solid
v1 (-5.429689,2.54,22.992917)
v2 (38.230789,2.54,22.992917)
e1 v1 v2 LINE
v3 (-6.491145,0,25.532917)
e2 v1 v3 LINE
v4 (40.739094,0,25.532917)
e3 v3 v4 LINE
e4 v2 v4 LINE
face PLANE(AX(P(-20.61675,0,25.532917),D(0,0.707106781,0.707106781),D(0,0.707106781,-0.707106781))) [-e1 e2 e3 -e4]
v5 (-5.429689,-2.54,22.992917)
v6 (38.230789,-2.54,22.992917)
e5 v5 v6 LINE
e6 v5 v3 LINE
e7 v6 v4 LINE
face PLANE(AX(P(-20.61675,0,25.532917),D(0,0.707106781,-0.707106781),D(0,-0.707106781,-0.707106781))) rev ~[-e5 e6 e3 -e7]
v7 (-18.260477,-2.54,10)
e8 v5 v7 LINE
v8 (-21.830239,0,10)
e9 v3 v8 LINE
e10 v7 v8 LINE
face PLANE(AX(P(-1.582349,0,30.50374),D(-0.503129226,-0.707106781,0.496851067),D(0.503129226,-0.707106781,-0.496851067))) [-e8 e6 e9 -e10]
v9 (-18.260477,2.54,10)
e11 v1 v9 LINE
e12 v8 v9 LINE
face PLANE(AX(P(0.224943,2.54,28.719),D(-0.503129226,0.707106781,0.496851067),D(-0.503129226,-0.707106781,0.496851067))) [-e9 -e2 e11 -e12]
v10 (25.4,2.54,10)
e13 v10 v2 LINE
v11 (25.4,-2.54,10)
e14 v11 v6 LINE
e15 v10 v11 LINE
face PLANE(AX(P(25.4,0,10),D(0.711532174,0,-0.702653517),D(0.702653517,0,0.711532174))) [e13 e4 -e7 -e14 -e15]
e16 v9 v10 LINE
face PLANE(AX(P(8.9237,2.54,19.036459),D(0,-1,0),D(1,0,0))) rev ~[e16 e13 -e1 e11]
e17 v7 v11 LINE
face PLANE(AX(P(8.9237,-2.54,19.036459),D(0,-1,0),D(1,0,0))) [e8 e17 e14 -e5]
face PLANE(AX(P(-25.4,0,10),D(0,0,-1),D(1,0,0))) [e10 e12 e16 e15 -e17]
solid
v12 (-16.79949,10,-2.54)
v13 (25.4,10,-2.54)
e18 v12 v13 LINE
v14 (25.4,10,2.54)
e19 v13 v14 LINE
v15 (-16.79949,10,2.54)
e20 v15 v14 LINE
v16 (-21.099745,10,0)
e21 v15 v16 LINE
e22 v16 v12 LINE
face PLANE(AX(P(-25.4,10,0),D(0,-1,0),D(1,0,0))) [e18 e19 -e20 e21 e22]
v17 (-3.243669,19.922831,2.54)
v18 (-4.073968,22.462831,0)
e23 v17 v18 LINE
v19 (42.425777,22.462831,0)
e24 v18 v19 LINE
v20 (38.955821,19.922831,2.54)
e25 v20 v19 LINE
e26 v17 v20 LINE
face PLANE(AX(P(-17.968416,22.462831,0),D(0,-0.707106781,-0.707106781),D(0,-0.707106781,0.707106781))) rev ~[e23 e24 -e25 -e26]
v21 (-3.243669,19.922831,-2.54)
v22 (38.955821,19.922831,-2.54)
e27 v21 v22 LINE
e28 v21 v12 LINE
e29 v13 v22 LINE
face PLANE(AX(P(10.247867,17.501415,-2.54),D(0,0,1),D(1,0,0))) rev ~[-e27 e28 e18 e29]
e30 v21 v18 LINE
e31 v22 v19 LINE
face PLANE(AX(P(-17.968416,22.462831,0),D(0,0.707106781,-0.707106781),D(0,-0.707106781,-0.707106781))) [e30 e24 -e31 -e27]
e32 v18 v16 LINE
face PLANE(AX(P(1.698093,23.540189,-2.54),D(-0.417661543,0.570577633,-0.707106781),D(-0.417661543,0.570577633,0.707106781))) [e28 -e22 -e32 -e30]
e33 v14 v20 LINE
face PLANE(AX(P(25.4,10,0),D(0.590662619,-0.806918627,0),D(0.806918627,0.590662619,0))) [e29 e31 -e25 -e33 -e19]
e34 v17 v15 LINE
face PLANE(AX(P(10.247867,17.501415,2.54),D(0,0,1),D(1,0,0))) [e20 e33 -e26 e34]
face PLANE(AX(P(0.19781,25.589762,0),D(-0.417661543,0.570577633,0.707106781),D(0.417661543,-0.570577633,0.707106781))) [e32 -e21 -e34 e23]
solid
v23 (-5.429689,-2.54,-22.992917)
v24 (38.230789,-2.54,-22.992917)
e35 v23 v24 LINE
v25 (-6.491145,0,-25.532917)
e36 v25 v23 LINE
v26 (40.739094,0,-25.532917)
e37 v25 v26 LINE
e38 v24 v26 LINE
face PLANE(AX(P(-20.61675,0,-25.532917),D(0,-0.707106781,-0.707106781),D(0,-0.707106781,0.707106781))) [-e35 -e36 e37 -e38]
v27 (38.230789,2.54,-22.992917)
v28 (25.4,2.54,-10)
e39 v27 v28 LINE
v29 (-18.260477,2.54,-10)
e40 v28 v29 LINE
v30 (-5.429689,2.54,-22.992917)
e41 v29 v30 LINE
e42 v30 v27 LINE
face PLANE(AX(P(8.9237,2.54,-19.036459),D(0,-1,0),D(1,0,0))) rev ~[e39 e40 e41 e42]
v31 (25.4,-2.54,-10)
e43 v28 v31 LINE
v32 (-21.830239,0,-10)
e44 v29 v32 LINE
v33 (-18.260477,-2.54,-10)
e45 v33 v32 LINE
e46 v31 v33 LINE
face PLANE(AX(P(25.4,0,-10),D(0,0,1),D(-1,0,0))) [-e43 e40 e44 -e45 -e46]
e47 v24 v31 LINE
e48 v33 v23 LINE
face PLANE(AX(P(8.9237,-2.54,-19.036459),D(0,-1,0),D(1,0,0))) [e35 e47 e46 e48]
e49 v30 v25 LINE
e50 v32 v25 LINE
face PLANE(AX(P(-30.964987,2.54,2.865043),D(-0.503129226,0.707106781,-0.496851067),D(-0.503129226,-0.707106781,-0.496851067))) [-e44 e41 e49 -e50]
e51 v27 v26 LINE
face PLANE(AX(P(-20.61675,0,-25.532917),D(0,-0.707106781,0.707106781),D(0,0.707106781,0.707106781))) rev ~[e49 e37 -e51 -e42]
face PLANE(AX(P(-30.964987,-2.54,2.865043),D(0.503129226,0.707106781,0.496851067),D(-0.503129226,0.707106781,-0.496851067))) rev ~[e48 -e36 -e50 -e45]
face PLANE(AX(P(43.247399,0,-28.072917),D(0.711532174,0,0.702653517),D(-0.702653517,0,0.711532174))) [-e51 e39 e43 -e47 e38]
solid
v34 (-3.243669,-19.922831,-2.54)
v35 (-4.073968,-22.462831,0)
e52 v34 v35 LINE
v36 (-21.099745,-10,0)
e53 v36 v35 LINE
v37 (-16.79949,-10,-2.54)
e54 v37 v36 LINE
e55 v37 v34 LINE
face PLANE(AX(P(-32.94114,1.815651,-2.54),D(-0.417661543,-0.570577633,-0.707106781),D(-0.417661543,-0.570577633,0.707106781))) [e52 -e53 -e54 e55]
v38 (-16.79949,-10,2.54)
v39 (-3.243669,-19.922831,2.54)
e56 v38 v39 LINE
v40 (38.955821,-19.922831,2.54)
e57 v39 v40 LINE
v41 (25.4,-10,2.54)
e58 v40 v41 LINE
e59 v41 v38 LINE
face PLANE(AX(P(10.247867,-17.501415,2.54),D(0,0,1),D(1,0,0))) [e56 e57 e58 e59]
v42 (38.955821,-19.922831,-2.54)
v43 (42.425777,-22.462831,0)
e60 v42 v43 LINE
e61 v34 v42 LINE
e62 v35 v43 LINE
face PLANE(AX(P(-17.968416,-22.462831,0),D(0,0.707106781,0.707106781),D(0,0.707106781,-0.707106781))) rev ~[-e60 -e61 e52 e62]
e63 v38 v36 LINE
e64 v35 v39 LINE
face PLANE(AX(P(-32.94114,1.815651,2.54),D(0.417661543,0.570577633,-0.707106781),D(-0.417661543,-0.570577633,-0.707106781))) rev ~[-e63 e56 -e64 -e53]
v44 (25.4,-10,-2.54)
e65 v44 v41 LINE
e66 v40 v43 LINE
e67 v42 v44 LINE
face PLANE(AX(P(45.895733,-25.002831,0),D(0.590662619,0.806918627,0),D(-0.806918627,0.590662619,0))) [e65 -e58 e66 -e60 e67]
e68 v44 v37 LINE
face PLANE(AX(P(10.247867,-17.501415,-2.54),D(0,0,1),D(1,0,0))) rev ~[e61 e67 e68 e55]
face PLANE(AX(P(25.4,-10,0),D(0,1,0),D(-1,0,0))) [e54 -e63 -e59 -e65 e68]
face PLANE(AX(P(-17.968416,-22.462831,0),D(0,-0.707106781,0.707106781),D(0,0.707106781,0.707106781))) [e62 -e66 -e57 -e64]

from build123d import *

# Parameters (mm, degrees)
F2_DEPTH      = 2.54
F3_DEPTH      = 2.54
F4_T1_DEPTH   = 76.9282991577
F4_2_T1_DEPTH = 76.9282991577
F4_3_T1_DEPTH = 76.9282991577
F4_4_T1_DEPTH = 76.9282991577
F5_T1_DEPTH   = 44.3887766137
F5_2_T1_DEPTH = 42.9277887493
F5_3_T1_DEPTH = 44.3887766137
F5_4_T1_DEPTH = 42.9277887493


# Not quite as in the source:
# - a fillet or chamfer that OpenCascade refuses, or shapes differently, is made with other operations: its cross-section is extruded or revolved along the edge and cut away or added


with BuildPart() as f2:
    # F0 (on Top) → F2 (new body, symmetric)
    with BuildSketch(Plane.XY):
        Polygon((-25.4, 10), (25.4, 10), (45.8957331301, 25.0028305149), (-4.9042668699, 25.0028305149), align=None)
    extrude(amount=F2_DEPTH, both=True)

    # F4#3: chamfer of 5.08 on 2 edges, made by hand

    # F4_3_s2 → F4_3_t1 (cut)
    with BuildSketch(Plane.YZ.offset(-17.9684164487)):
        Polygon((25.0028305149, -2.54), (19.9228305149, 2.54), (25.0028305149, 2.54), align=None)
        Polygon((25.0028305149, 2.54), (19.9228305149, -2.54), (25.0028305149, -2.54), align=None)
    extrude(amount=F4_3_T1_DEPTH, mode=Mode.SUBTRACT)

    # F5#2: chamfer of 5.08 on 2 edges, made by hand

    # F5_2_s2 → F5_2_t1 (cut)
    with BuildSketch(Plane(origin=(12.3253045755, 9.0220952047, 0), x_dir=(0, 0, 1), z_dir=(-0.8069186272, -0.5906626187, 0))):
        Polygon((-2.54, 17.9920167866), (2.54, 23.0720167866), (-2.54, 23.0720167866), align=None)
        Polygon((-2.54, 23.0720167866), (2.54, 17.9920167866), (2.54, 23.0720167866), align=None)
    extrude(amount=F5_2_T1_DEPTH, mode=Mode.SUBTRACT)


with BuildPart() as f2b:
    # F0 (on Top) → F2, piece 2 (new body, symmetric)
    with BuildSketch(Plane.XY):
        Polygon((45.8957331301, -25.0028305149), (25.4, -10), (-25.4, -10), (-4.9042668699, -25.0028305149), align=None)
    extrude(amount=F2_DEPTH, both=True)

    # F4: chamfer of 5.08 on 2 edges, made by hand

    # F4_s2 → F4_t1 (cut)
    with BuildSketch(Plane.YZ.offset(-17.9684164487)):
        Polygon((-25.0028305149, 2.54), (-19.9228305149, -2.54), (-25.0028305149, -2.54), align=None)
        Polygon((-25.0028305149, -2.54), (-19.9228305149, 2.54), (-25.0028305149, 2.54), align=None)
    extrude(amount=F4_T1_DEPTH, mode=Mode.SUBTRACT)

    # F5#4: chamfer of 5.08 on 2 edges, made by hand

    # F5_4_s2 → F5_4_t1 (cut)
    with BuildSketch(Plane(origin=(-22.3139277895, 16.3337449128, 0), x_dir=(0, 0, 1), z_dir=(0.8069186272, -0.5906626187, 0))):
        Polygon((2.54, 17.9920167866), (-2.54, 23.0720167866), (2.54, 23.0720167866), align=None)
        Polygon((-2.54, 17.9920167866), (2.54, 23.0720167866), (-2.54, 23.0720167866), align=None)
    extrude(amount=F5_4_T1_DEPTH, mode=Mode.SUBTRACT)


with BuildPart() as f3:
    # F1 (on Front) → F3 (new body, symmetric)
    with BuildSketch(Plane.XZ):
        Polygon((-25.4, 10), (25.4, 10), (43.2473993288, 28.0729172299), (-7.5526006712, 28.0729172299), align=None)
    extrude(amount=F3_DEPTH, both=True)

    # F4#2: chamfer of 5.08 on 2 edges, made by hand

    # F4_2_s2 → F4_2_t1 (cut)
    with BuildSketch(Plane.YZ.offset(-20.6167502501)):
        Polygon((-2.54, 28.0729172299), (2.54, 22.9929172299), (2.54, 28.0729172299), align=None)
        Polygon((2.54, 28.0729172299), (-2.54, 22.9929172299), (-2.54, 28.0729172299), align=None)
    extrude(amount=F4_2_T1_DEPTH, mode=Mode.SUBTRACT)

    # F5#3: chamfer of 5.08 on 2 edges, made by hand

    # F5_3_s2 → F5_3_t1 (cut)
    with BuildSketch(Plane(origin=(14.4694272926, 0, 14.6522614868), x_dir=(0, 1, 0), z_dir=(-0.7026535169, 0, -0.7115321744))):
        Polygon((2.54, -20.0194523987), (-2.54, -25.0994523987), (2.54, -25.0994523987), align=None)
        Polygon((2.54, -25.0994523987), (-2.54, -20.0194523987), (-2.54, -25.0994523987), align=None)
    extrude(amount=F5_3_T1_DEPTH, mode=Mode.SUBTRACT)


with BuildPart() as f3b:
    # F1 (on Front) → F3, piece 2 (new body, symmetric)
    with BuildSketch(Plane.XZ):
        Polygon((43.2473993288, -28.0729172299), (25.4, -10), (-25.4, -10), (-7.5526006712, -28.0729172299), align=None)
    extrude(amount=F3_DEPTH, both=True)

    # F4#4: chamfer of 5.08 on 2 edges, made by hand

    # F4_4_s2 → F4_4_t1 (cut)
    with BuildSketch(Plane.YZ.offset(-20.6167502501)):
        Polygon((-2.54, -28.0729172299), (2.54, -22.9929172299), (2.54, -28.0729172299), align=None)
        Polygon((2.54, -28.0729172299), (-2.54, -22.9929172299), (-2.54, -28.0729172299), align=None)
    extrude(amount=F4_4_T1_DEPTH, mode=Mode.SUBTRACT)

    # F5: chamfer of 5.08 on 2 edges, made by hand

    # F5_s2 → F5_t1 (cut)
    with BuildSketch(Plane(origin=(-16.720502705, 0, 16.9317812564), x_dir=(0, 1, 0), z_dir=(0.7026535169, 0, -0.7115321744))):
        Polygon((2.54, -20.0194523987), (-2.54, -25.0994523987), (2.54, -25.0994523987), align=None)
        Polygon((-2.54, -20.0194523987), (2.54, -25.0994523987), (-2.54, -25.0994523987), align=None)
    extrude(amount=F5_T1_DEPTH, mode=Mode.SUBTRACT)


solid = Compound([f2.part, f2b.part, f3.part, f3b.part])
